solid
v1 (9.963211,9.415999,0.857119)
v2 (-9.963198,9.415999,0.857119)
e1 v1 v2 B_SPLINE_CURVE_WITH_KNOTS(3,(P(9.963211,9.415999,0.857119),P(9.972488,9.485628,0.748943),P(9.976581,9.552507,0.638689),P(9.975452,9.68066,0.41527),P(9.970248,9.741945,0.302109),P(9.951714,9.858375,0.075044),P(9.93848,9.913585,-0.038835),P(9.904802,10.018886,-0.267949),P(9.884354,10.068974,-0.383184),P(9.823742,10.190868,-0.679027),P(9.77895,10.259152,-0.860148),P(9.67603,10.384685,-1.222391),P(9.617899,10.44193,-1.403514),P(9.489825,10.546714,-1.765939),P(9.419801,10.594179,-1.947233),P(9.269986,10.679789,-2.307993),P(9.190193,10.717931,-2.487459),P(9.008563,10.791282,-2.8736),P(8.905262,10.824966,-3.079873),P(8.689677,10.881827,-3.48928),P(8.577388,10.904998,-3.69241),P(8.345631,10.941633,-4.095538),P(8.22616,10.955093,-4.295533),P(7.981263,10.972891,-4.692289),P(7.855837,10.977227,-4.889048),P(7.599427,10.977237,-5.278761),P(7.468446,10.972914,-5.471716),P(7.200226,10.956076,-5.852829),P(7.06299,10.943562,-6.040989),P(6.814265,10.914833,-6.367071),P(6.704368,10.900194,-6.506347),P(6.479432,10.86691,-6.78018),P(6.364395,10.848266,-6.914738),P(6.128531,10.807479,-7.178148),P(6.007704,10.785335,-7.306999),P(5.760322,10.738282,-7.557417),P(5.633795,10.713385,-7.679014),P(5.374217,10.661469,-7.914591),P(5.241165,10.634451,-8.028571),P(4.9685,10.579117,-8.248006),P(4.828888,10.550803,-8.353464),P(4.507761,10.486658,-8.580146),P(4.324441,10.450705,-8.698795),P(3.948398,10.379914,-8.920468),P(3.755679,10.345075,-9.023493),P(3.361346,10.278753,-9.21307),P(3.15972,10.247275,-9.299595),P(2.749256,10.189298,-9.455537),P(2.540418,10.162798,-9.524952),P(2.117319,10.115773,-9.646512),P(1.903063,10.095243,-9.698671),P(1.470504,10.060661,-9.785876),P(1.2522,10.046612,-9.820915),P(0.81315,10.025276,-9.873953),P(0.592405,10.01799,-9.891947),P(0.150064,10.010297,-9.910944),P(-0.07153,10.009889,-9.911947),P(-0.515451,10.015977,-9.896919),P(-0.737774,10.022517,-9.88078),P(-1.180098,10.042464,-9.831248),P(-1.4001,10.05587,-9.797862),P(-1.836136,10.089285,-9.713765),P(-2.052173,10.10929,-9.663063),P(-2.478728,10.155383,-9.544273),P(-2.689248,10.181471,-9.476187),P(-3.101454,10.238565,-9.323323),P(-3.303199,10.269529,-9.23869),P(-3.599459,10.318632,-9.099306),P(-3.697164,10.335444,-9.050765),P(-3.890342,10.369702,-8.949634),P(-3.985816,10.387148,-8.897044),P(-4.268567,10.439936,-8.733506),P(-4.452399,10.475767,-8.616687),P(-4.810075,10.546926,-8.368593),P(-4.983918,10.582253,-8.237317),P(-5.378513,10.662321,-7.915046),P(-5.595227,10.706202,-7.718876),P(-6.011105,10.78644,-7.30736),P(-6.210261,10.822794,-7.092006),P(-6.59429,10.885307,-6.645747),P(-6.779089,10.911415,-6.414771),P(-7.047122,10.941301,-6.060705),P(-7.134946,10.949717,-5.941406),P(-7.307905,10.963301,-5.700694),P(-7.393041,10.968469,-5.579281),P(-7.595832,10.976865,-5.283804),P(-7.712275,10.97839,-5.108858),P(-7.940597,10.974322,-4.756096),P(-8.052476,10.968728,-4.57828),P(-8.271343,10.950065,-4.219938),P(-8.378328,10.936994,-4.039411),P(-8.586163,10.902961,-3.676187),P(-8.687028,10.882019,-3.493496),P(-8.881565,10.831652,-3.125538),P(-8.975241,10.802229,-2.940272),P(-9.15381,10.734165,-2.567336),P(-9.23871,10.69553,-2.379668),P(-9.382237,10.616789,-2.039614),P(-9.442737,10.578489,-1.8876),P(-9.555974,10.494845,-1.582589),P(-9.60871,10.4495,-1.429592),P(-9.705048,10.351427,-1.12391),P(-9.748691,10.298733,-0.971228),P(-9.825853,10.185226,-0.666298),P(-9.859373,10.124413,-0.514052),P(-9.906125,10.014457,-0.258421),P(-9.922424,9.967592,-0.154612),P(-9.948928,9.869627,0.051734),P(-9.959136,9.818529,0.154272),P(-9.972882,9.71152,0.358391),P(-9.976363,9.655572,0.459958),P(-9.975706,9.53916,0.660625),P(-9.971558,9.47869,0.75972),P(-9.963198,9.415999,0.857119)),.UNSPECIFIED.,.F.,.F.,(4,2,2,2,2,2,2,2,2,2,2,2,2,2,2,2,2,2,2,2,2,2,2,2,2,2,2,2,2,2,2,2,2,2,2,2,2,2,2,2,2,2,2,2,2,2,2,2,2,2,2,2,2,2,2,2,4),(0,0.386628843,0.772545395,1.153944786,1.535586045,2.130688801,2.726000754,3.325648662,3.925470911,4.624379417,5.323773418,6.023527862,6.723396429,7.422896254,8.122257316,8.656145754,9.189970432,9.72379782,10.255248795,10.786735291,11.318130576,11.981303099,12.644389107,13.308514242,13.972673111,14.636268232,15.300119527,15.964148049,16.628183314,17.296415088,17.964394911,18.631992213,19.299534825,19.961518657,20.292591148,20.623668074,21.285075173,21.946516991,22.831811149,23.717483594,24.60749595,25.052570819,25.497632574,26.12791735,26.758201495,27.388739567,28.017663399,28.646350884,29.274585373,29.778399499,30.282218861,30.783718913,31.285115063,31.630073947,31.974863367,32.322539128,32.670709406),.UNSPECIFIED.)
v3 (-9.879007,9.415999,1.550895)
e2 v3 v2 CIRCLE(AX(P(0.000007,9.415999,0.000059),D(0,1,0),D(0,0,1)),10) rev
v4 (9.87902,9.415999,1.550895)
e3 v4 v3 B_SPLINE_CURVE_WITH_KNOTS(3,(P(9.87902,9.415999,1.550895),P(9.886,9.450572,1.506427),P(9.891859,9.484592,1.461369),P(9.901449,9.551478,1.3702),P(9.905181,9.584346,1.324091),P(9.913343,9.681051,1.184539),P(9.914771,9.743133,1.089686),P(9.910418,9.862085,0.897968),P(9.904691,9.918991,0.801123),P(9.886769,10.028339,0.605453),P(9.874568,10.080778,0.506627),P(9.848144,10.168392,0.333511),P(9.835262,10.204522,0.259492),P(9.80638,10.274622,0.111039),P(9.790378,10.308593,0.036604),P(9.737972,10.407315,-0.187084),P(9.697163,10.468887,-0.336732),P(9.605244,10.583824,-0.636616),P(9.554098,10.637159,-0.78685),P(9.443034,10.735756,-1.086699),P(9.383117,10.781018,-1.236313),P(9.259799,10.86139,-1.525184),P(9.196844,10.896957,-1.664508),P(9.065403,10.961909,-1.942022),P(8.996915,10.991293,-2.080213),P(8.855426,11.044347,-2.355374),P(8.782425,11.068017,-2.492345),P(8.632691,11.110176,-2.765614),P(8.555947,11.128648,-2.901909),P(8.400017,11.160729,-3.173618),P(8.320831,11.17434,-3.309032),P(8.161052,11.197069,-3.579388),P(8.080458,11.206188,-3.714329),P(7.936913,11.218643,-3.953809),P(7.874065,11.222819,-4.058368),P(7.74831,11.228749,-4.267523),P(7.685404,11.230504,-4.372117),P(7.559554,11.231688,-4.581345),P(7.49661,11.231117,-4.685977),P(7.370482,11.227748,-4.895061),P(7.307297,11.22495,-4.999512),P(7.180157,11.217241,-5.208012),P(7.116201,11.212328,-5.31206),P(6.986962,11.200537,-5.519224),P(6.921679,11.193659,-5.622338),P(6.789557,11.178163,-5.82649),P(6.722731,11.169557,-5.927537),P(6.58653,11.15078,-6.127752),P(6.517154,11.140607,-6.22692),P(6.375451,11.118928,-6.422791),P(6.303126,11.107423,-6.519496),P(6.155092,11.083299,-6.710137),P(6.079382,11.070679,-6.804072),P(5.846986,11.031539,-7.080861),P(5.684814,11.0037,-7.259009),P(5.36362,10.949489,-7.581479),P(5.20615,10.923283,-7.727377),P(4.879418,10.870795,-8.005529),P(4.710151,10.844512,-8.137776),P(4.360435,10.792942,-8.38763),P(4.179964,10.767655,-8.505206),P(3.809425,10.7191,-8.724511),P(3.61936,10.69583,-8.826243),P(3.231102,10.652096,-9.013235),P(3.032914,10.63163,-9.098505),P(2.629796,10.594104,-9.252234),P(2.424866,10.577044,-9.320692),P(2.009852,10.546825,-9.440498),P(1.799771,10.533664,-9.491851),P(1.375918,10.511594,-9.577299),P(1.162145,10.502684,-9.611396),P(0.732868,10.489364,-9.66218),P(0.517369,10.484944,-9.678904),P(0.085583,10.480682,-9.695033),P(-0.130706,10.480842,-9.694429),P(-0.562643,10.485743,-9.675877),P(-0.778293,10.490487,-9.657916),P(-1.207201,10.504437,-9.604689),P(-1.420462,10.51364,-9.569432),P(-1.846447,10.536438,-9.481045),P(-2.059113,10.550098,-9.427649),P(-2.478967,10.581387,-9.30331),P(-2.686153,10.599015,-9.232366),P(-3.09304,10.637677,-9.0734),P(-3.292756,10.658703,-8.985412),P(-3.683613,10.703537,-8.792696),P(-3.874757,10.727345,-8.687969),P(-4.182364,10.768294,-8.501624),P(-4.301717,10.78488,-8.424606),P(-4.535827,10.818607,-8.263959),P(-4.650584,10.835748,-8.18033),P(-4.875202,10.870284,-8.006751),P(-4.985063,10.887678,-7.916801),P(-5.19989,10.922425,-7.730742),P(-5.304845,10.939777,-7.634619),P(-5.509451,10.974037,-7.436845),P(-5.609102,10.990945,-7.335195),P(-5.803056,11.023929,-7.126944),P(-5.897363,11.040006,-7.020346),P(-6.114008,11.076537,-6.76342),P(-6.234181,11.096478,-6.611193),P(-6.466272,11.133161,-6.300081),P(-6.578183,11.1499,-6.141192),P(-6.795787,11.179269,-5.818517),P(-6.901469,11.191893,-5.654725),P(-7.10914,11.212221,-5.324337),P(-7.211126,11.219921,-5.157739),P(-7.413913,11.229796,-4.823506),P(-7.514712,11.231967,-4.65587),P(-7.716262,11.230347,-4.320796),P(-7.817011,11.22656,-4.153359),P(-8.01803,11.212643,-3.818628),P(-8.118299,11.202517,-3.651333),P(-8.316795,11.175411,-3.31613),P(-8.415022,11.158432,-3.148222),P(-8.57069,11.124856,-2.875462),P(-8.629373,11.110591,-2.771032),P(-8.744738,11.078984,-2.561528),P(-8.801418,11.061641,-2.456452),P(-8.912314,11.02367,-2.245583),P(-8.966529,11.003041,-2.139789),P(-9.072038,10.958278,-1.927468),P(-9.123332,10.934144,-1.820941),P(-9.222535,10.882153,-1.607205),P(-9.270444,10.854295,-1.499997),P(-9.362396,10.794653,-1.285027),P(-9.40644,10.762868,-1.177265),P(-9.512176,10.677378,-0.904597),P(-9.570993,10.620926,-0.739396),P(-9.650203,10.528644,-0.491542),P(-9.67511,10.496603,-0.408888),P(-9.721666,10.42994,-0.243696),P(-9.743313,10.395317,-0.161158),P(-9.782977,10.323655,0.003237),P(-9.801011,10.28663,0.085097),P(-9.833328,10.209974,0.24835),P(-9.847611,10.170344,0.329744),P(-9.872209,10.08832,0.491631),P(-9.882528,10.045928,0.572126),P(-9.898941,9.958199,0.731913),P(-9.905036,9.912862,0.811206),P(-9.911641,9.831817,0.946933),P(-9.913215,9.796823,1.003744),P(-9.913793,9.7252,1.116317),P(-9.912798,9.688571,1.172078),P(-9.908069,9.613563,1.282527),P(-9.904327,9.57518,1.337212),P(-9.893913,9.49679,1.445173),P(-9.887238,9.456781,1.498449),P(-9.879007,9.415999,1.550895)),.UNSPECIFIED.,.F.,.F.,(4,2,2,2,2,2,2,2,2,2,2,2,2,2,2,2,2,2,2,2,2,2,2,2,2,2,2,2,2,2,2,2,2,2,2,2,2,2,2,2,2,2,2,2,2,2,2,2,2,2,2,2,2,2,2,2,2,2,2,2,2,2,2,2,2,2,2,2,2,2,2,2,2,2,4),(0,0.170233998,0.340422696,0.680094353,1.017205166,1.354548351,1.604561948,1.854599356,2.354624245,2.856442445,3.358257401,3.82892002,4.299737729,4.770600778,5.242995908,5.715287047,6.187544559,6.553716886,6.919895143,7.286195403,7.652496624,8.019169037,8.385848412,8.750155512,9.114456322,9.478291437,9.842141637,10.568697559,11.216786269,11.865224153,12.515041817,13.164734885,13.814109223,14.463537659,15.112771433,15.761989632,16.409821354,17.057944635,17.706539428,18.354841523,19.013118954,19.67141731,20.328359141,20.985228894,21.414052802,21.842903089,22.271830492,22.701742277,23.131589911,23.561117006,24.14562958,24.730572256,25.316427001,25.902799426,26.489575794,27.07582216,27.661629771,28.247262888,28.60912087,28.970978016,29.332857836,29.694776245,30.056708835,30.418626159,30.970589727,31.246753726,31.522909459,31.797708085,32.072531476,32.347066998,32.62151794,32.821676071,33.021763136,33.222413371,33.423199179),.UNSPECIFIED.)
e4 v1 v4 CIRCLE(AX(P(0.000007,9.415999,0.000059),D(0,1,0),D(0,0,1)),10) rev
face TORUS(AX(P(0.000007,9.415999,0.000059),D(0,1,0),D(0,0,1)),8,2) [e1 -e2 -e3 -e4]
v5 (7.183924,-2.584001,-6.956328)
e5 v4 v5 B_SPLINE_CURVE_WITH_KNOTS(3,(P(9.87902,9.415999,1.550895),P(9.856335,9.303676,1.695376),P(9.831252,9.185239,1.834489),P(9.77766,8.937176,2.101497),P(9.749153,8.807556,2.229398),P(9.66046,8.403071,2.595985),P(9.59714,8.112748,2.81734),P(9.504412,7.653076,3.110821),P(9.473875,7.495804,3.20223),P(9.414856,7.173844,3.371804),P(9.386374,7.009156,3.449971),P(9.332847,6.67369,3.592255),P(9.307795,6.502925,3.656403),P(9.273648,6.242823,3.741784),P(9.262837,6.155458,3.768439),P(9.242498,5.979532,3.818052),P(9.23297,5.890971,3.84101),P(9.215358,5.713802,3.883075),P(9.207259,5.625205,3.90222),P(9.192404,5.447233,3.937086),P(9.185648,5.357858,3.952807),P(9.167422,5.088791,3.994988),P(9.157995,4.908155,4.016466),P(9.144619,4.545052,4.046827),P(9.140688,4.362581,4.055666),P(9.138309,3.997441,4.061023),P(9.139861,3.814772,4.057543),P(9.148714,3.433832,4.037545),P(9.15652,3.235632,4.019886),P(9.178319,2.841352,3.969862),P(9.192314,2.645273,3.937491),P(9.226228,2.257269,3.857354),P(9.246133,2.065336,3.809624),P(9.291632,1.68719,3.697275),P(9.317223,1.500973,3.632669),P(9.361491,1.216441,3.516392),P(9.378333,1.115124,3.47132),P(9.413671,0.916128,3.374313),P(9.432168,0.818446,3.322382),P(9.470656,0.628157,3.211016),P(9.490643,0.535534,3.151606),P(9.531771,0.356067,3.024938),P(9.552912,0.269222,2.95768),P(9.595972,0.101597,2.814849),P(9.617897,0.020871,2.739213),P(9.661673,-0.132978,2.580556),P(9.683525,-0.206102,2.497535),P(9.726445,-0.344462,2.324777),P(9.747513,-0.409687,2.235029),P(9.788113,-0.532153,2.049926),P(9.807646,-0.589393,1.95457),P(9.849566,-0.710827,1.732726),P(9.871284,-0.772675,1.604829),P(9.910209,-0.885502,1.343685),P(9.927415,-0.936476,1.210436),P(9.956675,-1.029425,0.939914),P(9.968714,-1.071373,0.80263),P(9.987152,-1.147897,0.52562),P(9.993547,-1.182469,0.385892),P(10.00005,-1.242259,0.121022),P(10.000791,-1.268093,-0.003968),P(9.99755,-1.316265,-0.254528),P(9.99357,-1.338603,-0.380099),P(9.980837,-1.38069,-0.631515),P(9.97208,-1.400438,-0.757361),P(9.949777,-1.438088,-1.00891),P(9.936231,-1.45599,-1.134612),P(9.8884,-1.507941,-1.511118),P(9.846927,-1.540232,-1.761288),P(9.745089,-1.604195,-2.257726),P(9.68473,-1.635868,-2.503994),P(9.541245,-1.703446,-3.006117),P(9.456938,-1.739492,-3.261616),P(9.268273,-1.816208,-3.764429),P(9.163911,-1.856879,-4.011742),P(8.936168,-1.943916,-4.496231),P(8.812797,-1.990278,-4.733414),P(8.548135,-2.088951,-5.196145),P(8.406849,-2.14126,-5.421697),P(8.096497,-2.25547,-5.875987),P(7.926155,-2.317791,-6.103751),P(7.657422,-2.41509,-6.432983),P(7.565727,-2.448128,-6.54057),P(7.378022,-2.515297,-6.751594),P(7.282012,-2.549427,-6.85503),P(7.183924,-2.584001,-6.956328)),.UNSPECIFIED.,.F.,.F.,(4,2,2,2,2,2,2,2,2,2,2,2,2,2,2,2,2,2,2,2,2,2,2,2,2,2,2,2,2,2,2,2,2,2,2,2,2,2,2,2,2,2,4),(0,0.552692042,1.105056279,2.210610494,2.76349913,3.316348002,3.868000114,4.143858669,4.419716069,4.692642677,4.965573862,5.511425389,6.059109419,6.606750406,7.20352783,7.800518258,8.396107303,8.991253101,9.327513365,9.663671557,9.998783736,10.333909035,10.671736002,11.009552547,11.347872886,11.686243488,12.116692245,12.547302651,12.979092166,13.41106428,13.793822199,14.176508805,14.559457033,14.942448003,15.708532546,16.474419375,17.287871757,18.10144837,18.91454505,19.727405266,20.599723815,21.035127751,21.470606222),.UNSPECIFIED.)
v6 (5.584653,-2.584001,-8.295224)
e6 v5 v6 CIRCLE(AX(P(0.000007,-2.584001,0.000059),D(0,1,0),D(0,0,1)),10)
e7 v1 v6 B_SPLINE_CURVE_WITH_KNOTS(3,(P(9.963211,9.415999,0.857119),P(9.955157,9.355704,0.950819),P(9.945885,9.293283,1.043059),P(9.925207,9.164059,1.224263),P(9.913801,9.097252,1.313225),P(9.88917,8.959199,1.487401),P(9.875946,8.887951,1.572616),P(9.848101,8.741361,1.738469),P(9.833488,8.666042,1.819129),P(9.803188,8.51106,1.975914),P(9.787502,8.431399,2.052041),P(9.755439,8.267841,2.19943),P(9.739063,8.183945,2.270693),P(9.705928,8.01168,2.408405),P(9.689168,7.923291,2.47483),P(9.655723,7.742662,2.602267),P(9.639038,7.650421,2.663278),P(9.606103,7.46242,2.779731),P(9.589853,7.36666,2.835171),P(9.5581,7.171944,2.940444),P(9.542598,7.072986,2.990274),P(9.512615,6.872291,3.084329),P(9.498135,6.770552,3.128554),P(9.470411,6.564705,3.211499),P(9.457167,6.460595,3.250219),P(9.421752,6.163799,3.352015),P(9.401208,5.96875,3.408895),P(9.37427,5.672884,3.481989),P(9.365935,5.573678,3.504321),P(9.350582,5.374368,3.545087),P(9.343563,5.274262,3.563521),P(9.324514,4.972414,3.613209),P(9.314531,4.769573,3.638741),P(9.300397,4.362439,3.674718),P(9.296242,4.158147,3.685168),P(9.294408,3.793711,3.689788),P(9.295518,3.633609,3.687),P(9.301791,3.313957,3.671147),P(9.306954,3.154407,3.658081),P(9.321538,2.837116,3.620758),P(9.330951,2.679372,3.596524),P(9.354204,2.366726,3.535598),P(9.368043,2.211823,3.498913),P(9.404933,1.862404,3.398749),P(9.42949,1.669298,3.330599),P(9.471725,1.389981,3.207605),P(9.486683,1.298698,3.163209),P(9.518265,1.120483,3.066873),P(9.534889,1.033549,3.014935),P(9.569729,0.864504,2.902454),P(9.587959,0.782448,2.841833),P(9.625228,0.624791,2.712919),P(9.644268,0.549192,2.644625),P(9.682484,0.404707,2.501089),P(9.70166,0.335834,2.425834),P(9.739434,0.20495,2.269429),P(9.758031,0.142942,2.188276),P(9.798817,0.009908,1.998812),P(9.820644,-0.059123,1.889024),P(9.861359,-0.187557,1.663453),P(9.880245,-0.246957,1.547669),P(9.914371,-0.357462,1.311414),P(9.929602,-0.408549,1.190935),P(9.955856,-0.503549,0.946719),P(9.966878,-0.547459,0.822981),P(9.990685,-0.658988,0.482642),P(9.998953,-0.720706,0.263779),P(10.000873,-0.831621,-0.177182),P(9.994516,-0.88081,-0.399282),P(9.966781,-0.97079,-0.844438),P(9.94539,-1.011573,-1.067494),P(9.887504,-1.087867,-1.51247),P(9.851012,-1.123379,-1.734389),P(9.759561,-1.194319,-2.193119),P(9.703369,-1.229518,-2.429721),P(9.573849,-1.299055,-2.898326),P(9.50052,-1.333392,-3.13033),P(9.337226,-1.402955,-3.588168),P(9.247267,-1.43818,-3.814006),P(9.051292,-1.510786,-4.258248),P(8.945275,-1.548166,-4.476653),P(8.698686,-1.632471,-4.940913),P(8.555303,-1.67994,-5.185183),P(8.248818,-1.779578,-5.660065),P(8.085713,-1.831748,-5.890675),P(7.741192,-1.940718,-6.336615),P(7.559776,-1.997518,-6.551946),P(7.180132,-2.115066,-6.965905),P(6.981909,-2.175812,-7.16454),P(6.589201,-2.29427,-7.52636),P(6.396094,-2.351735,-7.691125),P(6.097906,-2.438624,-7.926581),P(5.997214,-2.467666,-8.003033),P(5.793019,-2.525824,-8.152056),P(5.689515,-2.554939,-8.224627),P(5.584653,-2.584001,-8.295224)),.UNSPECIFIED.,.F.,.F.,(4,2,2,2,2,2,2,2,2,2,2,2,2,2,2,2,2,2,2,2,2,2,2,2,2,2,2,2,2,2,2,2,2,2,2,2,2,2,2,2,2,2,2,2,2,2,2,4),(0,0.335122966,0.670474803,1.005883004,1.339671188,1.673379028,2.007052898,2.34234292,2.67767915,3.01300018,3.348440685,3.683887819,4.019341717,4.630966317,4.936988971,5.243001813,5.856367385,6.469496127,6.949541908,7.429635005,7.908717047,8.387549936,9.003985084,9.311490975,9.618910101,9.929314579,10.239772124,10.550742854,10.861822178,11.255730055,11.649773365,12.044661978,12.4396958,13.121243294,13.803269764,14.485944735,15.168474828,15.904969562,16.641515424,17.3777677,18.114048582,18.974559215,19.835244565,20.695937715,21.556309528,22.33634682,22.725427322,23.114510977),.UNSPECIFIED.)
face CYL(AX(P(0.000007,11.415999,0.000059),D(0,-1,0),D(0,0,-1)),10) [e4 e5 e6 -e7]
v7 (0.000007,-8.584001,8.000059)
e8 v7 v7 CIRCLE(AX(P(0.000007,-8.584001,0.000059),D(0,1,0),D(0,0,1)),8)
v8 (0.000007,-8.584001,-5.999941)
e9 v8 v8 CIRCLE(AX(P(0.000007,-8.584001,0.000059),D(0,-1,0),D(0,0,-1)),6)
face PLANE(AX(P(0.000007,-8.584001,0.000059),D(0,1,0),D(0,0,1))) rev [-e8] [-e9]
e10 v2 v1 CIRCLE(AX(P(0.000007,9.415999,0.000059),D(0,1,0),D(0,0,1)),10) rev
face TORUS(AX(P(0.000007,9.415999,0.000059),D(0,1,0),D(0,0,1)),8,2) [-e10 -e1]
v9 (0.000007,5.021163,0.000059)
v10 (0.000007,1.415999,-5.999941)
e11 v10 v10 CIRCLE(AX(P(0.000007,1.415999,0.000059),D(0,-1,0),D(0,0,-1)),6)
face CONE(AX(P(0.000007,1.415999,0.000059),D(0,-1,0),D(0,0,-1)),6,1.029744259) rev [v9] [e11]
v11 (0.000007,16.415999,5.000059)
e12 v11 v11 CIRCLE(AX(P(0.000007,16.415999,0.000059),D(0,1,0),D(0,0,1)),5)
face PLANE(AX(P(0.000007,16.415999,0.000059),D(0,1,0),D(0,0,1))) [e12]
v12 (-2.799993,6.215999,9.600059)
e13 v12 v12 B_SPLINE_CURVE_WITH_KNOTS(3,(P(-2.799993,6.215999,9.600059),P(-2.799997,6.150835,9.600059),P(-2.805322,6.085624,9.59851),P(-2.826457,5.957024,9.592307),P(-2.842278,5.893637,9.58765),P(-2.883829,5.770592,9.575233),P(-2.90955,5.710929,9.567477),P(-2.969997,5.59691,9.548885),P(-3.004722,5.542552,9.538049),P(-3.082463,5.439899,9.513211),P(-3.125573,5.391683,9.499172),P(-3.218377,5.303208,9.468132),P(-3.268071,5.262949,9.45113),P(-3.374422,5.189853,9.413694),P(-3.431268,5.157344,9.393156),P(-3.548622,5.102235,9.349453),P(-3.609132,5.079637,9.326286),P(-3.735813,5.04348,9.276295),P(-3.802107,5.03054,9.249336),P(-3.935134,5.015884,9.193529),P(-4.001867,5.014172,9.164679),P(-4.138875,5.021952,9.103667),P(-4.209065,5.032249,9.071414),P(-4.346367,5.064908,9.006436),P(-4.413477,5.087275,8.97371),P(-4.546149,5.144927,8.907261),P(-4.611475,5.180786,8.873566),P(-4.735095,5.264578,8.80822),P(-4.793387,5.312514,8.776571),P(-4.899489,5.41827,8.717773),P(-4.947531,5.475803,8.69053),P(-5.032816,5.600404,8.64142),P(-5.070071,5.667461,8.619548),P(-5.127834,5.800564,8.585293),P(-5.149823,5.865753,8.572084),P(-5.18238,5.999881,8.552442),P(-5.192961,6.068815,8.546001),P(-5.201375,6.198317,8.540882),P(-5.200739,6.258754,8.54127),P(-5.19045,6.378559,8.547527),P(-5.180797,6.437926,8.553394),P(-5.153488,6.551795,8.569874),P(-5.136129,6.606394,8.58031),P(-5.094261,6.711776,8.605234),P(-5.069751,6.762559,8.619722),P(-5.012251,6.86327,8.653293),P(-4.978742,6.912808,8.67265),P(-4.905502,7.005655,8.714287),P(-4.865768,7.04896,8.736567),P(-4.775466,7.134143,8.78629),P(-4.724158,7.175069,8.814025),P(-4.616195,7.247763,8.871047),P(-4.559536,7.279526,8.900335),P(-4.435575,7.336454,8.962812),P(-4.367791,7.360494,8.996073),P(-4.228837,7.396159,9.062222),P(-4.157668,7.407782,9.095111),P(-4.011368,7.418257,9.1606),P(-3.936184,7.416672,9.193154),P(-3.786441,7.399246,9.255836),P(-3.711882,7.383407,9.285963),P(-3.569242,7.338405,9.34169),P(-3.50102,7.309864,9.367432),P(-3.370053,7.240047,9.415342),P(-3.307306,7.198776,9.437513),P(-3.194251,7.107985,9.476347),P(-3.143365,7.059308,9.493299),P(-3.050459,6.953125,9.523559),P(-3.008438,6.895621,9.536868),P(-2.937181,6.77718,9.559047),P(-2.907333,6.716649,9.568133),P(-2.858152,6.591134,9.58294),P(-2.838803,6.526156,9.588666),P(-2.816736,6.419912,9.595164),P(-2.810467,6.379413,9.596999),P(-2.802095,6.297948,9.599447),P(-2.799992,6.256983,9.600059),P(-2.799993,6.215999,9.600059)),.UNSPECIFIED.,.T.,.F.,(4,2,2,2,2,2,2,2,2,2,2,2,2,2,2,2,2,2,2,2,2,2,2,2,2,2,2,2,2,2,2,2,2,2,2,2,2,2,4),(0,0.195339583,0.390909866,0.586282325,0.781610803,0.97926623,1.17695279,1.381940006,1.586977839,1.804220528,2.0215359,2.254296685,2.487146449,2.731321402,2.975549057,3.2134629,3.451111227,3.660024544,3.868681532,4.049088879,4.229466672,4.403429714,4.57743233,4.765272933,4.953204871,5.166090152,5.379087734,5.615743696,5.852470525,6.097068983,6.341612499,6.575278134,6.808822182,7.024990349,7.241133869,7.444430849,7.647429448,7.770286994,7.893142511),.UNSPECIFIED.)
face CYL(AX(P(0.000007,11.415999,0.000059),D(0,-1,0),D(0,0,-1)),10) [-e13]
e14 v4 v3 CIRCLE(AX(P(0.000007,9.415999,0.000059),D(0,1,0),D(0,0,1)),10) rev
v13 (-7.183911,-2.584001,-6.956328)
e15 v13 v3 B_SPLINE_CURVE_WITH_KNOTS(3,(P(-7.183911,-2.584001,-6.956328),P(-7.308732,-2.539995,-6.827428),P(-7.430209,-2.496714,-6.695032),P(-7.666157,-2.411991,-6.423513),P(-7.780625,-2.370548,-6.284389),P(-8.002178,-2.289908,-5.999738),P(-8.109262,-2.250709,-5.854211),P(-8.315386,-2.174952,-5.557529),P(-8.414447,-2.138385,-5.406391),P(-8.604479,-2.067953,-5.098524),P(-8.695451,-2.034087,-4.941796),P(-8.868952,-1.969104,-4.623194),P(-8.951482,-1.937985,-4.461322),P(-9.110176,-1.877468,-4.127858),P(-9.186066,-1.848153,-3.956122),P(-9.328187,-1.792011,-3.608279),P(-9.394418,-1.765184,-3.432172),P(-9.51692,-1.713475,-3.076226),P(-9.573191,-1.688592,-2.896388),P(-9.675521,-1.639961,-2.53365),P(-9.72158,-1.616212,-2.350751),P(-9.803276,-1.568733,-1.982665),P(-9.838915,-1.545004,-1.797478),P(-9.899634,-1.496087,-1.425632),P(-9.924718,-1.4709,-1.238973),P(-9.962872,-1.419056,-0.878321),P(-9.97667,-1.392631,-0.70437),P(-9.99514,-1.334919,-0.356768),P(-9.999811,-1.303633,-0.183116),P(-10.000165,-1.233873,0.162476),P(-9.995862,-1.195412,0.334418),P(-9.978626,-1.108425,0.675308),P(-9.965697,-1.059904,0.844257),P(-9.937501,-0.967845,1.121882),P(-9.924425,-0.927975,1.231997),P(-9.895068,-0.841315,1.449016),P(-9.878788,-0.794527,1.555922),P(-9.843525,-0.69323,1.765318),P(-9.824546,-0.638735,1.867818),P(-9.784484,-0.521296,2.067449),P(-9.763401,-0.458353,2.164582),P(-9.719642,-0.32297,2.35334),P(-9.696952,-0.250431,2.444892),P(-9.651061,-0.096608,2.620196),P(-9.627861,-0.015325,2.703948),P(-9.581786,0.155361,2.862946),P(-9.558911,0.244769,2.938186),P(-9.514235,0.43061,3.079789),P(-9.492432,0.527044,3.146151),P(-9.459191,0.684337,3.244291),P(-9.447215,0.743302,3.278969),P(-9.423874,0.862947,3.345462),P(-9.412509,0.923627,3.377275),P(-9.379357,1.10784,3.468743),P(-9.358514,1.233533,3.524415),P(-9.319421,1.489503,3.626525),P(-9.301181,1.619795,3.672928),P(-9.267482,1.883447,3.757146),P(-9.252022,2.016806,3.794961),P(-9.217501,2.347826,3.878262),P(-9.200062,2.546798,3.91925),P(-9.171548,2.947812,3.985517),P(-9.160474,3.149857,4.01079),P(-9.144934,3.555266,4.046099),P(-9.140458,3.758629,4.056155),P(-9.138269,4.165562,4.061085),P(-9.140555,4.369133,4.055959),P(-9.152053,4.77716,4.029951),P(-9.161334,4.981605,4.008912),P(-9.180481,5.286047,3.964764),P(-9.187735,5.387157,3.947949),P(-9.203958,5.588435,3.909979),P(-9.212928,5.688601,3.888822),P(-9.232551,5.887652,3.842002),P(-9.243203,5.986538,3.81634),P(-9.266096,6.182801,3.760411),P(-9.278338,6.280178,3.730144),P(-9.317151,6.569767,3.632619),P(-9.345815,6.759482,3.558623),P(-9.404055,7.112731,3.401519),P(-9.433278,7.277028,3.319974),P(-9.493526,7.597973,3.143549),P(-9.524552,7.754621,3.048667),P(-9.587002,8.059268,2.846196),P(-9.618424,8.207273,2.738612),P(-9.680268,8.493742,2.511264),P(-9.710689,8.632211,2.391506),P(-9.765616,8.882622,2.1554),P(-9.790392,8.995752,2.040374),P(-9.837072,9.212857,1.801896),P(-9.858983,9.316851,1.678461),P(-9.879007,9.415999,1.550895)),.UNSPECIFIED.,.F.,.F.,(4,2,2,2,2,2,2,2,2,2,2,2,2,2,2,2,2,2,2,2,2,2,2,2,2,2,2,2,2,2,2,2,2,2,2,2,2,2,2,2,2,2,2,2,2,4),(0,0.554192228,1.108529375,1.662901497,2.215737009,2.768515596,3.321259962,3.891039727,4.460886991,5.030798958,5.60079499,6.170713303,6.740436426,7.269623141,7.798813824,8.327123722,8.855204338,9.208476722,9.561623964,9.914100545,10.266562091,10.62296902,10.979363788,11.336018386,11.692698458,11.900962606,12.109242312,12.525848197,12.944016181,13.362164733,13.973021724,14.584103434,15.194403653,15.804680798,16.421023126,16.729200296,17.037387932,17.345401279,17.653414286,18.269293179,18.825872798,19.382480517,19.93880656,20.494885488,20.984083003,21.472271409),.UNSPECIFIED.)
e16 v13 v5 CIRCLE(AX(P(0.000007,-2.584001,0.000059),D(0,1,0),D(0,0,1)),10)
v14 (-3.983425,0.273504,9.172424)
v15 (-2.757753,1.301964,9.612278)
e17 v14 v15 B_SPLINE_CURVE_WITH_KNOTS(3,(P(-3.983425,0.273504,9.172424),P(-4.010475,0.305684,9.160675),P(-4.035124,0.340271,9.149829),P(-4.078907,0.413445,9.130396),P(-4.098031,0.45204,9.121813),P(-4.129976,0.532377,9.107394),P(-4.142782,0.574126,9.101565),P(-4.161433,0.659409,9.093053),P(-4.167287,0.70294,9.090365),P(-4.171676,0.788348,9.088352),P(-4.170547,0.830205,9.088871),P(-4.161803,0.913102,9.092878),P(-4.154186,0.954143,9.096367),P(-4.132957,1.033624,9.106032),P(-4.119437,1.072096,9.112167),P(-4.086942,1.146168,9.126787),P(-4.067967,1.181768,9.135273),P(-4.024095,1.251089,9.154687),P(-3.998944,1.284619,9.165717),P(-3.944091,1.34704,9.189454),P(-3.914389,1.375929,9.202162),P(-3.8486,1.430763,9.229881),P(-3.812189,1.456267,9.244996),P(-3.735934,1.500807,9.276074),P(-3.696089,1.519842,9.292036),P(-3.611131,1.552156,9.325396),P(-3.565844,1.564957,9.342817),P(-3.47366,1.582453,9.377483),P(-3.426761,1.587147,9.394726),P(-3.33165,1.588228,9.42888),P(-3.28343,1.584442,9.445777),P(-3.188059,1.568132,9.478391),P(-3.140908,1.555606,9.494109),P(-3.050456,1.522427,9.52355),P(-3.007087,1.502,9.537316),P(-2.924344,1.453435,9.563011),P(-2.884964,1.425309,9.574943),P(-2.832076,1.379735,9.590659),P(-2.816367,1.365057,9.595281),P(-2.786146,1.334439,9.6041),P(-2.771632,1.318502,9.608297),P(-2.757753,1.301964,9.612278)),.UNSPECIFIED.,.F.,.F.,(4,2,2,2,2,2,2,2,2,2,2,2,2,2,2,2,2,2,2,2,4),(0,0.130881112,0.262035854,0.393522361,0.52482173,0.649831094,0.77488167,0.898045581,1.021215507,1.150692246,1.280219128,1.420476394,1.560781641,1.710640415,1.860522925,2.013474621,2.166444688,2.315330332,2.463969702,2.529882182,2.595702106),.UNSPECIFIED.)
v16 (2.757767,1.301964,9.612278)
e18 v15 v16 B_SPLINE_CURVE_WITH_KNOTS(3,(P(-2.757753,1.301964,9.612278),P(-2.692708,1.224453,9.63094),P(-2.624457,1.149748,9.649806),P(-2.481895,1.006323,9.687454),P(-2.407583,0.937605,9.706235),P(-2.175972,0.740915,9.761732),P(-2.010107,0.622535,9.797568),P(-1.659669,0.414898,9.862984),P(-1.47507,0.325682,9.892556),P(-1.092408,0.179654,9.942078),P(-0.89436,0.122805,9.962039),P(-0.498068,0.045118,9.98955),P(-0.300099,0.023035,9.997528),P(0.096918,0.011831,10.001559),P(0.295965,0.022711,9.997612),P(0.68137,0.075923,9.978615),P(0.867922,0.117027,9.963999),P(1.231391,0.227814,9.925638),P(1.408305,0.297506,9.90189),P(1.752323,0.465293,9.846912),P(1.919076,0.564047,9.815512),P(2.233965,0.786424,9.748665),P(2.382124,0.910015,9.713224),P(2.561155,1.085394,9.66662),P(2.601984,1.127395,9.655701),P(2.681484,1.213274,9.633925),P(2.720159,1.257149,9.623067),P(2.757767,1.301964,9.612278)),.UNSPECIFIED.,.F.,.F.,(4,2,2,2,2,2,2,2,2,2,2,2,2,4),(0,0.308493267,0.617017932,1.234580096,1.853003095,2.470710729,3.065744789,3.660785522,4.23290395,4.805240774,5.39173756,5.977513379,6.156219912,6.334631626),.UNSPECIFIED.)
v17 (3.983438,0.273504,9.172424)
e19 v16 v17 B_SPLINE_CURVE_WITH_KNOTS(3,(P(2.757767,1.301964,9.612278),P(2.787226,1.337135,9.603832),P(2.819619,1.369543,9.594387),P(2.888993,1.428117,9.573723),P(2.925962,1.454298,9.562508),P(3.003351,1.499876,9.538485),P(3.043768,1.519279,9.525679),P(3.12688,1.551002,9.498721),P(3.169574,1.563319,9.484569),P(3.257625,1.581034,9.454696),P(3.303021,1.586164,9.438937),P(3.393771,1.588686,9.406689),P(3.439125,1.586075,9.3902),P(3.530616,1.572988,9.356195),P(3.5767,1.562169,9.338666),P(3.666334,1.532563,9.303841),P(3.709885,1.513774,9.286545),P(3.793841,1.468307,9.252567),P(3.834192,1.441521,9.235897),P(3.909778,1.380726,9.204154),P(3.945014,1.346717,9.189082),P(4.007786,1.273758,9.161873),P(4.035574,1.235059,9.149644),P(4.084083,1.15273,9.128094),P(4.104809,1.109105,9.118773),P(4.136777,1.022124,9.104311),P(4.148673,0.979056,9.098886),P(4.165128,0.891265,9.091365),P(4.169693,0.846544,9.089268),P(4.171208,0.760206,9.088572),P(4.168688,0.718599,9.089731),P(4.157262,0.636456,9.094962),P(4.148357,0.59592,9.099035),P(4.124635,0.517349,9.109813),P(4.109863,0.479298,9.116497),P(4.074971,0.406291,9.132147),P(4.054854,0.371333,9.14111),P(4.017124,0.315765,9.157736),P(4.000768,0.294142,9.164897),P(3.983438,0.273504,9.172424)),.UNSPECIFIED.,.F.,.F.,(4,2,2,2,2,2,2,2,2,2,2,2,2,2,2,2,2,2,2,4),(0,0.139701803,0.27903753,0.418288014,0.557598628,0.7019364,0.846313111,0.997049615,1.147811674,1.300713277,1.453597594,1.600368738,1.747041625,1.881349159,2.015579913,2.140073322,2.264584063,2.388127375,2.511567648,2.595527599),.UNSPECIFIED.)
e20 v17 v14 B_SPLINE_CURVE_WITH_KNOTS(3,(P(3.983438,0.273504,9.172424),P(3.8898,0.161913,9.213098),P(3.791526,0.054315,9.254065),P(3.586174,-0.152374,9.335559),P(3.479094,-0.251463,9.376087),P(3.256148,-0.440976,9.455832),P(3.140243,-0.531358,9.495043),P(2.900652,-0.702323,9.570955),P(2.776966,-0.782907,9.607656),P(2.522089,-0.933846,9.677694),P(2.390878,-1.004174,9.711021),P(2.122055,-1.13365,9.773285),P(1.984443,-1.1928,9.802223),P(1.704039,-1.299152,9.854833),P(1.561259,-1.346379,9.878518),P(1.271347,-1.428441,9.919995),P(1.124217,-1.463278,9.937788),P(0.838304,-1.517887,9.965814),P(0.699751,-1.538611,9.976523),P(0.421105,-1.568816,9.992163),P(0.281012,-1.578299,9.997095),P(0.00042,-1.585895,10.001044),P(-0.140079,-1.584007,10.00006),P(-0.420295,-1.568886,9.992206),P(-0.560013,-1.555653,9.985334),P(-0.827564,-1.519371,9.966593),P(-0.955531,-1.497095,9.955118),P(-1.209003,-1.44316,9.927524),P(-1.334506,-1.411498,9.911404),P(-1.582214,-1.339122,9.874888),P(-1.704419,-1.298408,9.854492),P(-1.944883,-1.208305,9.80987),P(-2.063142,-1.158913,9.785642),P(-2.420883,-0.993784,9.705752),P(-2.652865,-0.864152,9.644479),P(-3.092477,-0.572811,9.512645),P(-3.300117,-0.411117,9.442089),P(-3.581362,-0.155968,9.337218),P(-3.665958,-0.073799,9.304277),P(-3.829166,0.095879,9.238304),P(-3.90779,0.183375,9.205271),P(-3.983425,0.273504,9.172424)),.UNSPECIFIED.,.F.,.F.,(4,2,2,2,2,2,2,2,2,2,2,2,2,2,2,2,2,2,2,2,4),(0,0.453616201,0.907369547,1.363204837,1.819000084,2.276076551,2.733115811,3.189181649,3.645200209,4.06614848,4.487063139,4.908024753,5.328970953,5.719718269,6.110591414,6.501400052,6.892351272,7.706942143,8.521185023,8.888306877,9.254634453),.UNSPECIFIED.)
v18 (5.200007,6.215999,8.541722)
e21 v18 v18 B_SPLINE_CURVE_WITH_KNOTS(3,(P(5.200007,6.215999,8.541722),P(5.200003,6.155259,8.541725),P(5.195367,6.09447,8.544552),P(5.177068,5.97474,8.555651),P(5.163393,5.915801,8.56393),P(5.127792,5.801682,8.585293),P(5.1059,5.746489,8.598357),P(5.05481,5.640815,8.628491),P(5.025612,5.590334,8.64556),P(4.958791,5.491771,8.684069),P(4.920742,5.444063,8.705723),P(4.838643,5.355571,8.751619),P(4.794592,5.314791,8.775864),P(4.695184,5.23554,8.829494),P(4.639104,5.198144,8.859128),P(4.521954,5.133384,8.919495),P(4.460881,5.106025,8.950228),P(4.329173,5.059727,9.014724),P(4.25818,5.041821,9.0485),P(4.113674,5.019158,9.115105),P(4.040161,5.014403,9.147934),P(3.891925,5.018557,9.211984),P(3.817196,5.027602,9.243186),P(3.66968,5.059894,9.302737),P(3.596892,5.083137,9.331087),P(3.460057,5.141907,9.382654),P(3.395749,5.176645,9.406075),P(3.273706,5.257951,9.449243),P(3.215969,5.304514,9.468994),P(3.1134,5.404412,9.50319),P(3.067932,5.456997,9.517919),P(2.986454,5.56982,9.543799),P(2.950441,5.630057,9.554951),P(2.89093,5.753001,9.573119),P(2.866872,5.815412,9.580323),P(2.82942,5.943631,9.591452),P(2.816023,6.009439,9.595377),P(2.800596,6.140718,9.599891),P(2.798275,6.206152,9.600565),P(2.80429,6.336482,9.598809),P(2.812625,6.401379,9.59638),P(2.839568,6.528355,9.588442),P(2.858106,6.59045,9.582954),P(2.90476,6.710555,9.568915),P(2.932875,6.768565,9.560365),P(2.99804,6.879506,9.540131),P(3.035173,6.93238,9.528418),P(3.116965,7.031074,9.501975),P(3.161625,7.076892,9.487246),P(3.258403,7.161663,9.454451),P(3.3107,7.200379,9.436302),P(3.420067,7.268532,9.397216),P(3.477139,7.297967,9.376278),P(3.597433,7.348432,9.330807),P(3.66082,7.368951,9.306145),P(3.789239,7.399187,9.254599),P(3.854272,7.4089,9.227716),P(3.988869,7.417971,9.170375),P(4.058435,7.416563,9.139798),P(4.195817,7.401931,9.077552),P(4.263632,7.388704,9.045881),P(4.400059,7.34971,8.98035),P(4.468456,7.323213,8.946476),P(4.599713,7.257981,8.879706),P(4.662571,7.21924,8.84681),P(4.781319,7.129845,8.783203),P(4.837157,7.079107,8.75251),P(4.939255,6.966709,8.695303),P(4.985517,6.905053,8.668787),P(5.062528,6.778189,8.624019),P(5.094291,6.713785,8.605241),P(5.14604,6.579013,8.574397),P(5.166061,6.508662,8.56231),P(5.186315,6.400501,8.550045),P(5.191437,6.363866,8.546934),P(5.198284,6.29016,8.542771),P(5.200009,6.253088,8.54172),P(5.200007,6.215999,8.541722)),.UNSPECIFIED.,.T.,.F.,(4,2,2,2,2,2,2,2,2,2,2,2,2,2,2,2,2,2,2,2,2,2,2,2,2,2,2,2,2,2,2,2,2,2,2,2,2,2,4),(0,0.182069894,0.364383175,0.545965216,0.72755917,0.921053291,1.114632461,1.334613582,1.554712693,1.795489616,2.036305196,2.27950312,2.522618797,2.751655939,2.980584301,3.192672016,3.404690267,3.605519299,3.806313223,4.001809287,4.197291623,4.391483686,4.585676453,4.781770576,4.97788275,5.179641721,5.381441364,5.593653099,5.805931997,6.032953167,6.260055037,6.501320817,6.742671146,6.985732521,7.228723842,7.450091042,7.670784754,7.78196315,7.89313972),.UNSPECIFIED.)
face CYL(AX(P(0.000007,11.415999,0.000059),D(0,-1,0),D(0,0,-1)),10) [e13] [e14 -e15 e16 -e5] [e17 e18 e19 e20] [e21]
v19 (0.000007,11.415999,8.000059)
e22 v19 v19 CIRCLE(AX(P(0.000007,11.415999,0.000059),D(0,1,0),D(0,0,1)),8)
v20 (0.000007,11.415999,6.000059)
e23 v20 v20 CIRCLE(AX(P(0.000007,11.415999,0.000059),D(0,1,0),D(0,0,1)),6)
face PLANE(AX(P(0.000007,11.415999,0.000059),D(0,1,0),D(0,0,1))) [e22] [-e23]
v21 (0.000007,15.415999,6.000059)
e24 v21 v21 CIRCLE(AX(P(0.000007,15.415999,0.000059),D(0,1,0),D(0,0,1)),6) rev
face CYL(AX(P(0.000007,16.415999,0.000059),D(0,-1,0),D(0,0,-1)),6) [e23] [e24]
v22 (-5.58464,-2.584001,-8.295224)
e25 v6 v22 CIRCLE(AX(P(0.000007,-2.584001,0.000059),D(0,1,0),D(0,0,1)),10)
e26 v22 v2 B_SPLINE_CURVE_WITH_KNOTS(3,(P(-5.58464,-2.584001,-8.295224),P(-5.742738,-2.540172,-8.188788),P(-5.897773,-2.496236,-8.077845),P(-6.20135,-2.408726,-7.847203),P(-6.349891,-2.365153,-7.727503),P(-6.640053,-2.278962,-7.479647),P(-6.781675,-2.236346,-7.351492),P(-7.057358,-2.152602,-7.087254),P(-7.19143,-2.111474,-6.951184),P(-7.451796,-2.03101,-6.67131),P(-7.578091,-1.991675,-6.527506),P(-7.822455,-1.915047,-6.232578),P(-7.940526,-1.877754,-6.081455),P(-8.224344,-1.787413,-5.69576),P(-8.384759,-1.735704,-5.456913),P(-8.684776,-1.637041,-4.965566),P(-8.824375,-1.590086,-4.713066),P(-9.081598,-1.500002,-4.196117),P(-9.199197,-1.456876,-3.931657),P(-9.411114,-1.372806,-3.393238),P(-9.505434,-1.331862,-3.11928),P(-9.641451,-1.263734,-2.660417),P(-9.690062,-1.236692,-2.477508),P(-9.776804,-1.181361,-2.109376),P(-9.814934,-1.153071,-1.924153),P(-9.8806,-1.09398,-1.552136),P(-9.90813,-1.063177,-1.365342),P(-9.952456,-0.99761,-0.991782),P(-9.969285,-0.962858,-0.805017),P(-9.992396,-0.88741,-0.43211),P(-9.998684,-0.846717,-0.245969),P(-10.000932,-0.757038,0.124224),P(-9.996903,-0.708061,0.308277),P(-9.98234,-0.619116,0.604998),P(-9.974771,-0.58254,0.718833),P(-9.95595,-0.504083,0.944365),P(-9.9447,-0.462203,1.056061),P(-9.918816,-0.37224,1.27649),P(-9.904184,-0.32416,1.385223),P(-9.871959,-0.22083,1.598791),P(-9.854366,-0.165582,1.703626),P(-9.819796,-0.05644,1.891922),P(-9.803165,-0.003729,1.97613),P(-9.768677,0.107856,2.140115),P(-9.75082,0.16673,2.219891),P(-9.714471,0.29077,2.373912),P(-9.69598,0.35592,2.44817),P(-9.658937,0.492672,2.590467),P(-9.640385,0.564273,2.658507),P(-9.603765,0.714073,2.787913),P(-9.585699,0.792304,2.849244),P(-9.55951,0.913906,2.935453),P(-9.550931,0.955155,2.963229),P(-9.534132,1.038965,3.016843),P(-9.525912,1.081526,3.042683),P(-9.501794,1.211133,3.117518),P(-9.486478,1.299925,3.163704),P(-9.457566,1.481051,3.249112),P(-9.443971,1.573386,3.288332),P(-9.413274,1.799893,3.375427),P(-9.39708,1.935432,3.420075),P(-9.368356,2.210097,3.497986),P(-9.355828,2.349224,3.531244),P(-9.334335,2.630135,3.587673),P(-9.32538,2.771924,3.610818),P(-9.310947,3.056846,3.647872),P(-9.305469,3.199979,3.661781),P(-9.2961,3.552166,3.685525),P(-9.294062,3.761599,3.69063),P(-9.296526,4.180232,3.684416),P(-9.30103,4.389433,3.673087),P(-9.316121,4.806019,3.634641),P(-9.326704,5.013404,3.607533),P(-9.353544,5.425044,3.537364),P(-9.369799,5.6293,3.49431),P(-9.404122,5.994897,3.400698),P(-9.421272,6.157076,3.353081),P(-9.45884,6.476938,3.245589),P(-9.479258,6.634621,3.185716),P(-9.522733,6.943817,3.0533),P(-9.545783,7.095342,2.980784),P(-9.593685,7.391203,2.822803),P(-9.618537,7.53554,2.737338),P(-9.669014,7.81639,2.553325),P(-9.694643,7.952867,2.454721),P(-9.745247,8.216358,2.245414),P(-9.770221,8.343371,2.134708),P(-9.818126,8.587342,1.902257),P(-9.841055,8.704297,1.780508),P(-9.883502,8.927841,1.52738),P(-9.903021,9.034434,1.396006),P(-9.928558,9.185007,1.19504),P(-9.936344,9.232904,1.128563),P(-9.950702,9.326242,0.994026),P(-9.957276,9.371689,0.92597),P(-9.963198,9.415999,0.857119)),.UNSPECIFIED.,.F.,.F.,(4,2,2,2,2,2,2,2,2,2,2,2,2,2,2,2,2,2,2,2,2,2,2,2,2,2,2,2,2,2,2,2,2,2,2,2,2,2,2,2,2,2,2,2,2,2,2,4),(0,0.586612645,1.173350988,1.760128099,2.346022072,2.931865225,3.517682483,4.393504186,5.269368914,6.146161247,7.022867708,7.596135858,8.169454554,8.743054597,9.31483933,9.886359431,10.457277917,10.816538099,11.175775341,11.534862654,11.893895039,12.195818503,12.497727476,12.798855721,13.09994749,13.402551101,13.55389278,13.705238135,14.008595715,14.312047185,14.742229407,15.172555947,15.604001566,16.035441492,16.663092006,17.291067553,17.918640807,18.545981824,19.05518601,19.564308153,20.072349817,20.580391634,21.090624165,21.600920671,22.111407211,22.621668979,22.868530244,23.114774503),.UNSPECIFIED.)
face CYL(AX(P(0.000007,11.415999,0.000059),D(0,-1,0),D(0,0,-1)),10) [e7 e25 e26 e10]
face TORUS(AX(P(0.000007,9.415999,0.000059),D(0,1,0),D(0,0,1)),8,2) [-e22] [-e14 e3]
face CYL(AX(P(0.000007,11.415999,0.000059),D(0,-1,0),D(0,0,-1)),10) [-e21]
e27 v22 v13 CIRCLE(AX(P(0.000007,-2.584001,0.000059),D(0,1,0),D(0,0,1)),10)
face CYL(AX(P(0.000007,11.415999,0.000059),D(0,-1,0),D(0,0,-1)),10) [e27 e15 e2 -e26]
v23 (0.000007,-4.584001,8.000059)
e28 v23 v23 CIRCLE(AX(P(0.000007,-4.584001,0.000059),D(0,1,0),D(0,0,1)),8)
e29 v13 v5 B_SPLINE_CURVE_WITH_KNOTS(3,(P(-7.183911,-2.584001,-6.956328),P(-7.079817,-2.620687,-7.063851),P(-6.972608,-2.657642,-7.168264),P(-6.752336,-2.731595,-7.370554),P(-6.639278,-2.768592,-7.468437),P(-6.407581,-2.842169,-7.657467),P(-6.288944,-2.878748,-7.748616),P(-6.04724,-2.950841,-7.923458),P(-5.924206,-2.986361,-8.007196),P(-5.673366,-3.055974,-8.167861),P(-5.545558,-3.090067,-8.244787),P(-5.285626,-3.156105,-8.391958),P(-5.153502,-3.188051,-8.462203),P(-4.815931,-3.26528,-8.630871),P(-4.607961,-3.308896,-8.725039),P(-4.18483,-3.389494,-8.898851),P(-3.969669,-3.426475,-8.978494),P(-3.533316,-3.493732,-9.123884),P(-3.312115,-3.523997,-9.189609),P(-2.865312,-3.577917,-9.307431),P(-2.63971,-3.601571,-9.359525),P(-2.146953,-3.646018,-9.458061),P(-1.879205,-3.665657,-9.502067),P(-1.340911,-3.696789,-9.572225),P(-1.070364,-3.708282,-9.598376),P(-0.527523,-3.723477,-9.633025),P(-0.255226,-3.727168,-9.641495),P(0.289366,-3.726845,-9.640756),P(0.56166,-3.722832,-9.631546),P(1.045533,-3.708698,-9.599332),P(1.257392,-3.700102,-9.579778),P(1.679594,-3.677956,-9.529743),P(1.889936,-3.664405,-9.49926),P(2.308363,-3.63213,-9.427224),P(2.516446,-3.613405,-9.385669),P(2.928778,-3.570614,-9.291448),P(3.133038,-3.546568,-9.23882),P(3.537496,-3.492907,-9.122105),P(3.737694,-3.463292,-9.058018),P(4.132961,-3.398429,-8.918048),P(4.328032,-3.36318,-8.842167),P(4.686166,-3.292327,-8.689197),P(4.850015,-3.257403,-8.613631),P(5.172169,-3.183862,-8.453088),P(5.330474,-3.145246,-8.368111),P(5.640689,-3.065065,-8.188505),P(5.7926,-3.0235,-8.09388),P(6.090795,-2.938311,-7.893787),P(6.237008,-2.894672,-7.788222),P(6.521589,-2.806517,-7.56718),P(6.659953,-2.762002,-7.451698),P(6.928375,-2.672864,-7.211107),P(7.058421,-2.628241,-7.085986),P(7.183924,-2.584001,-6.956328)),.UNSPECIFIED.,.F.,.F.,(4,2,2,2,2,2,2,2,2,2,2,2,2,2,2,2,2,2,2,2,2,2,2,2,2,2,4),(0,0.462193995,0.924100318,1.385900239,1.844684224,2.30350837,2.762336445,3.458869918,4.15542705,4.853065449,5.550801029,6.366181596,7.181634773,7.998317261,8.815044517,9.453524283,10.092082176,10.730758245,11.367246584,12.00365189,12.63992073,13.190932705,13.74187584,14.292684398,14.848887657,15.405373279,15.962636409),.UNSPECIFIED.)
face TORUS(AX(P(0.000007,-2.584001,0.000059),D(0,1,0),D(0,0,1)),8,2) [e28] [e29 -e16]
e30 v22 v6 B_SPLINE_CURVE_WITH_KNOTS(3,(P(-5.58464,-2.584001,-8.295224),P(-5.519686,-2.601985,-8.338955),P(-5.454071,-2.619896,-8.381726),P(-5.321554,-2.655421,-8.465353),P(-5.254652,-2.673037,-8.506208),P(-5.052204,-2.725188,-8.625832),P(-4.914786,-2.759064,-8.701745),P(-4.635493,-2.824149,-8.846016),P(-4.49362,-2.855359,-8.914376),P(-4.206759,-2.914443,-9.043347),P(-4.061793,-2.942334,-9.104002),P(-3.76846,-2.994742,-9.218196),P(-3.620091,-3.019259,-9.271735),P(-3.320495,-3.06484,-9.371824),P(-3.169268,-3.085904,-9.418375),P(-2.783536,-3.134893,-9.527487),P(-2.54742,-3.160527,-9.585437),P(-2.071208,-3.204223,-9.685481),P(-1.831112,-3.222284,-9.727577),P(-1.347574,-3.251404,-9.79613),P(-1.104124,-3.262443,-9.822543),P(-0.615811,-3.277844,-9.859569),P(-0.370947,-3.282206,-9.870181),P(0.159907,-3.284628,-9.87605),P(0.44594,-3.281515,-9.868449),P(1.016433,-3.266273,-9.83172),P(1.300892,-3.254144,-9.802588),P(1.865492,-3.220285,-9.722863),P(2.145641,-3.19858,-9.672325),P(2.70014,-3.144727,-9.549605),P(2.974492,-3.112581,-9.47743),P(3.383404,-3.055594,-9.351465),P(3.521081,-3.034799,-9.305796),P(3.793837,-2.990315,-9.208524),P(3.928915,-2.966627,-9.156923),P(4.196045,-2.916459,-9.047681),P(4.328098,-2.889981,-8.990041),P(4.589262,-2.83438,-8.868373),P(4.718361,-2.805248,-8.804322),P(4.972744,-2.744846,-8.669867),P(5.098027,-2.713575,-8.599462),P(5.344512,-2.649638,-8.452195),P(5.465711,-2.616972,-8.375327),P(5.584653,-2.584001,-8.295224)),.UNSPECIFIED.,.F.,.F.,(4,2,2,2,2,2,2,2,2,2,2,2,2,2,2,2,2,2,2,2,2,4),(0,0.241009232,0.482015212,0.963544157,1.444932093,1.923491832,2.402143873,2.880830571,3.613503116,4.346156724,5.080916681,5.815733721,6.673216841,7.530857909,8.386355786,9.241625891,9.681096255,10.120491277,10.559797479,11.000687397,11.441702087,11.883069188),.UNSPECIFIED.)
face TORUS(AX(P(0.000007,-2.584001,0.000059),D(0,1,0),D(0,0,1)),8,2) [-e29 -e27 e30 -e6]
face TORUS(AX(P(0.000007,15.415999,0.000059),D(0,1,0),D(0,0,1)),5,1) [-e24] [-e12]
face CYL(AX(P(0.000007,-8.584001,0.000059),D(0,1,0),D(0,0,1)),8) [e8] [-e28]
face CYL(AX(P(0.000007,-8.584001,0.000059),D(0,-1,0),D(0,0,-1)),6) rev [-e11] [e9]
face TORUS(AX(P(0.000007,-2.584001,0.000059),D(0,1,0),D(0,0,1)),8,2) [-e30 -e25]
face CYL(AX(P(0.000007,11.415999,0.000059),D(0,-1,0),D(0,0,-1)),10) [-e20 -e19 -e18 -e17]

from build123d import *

# Parameters (mm, degrees)
SKETCH1_R        = 5
HEAD_DEPTH       = 8
SKETCH3_R        = 4
NECK_DEPTH       = 2
SKETCH6_R        = 3
HEAD_KNOB_DEPTH  = 2.5
HEAD_HOLE_D      = 6
HEAD_HOLE_DEPTH  = 5
HEAD_HOLE_TIP    = 1.802581857
HEAD_ROUNDNESS_R = 1
EADY_INSERT_R    = 0.5
SCALE1_SCALE     = 2


with BuildPart() as part:
    # Sketch1 → Head (new body)
    with BuildSketch(Plane(origin=(0, 0, 0), x_dir=(1, 0, 0), z_dir=(0, 1, 0))):
        with Locations(Location((0, 0, 0), (0, 0, 270))):
            Circle(SKETCH1_R)
    extrude(amount=HEAD_DEPTH)

    # Sketch3 → Neck (add)
    with BuildSketch(Plane(origin=(0, 0, 0), x_dir=(1, 0, 0), z_dir=(0, 1, 0))):
        with Locations(Location((0, 0, 0), (0, 0, 270))):
            Circle(SKETCH3_R)
    extrude(amount=-NECK_DEPTH)

    # Sketch6 → Head knob (add)
    with BuildSketch(Plane(origin=(0, 8, 0), x_dir=(1, 0, 0), z_dir=(0, 1, 0))):
        with Locations(Location((0, 0, 0), (0, 0, 270))):
            Circle(SKETCH6_R)
    extrude(amount=HEAD_KNOB_DEPTH)

    # Head hole
    with Locations(Plane(origin=(0, -2, 0), x_dir=(-1, 0, 0), z_dir=(0, -1, 0))):
        with Locations((0, 0)):
            Hole(HEAD_HOLE_D / 2, depth=HEAD_HOLE_DEPTH)
            with Locations((0, 0, -(HEAD_HOLE_DEPTH + HEAD_HOLE_TIP / 2))):  # 118° drill point
                Cone(0, HEAD_HOLE_D / 2, HEAD_HOLE_TIP, mode=Mode.SUBTRACT)

    # Head roundness
    head_roundness_edges = [part.edges().sort_by_distance(p)[0] for p in [
        (0, 0, -5),
        (0, 8, -5),
    ]]
    fillet(head_roundness_edges, radius=HEAD_ROUNDNESS_R - 0.0001)  # a hair under: the kernel refuses the full size

    # Eady insert
    eady_insert_edges = [part.edges().sort_by_distance(p)[0] for p in [
        (0, 10.5, -3),
    ]]
    fillet(eady_insert_edges, radius=EADY_INSERT_R)


with BuildPart() as part_1:
    # Scale1: scaled about (0, 4.58400844, 0)
    add(part.part.scale(SCALE1_SCALE).moved(Location((0, -4.58400844, 0))))


solid = part_1.part
